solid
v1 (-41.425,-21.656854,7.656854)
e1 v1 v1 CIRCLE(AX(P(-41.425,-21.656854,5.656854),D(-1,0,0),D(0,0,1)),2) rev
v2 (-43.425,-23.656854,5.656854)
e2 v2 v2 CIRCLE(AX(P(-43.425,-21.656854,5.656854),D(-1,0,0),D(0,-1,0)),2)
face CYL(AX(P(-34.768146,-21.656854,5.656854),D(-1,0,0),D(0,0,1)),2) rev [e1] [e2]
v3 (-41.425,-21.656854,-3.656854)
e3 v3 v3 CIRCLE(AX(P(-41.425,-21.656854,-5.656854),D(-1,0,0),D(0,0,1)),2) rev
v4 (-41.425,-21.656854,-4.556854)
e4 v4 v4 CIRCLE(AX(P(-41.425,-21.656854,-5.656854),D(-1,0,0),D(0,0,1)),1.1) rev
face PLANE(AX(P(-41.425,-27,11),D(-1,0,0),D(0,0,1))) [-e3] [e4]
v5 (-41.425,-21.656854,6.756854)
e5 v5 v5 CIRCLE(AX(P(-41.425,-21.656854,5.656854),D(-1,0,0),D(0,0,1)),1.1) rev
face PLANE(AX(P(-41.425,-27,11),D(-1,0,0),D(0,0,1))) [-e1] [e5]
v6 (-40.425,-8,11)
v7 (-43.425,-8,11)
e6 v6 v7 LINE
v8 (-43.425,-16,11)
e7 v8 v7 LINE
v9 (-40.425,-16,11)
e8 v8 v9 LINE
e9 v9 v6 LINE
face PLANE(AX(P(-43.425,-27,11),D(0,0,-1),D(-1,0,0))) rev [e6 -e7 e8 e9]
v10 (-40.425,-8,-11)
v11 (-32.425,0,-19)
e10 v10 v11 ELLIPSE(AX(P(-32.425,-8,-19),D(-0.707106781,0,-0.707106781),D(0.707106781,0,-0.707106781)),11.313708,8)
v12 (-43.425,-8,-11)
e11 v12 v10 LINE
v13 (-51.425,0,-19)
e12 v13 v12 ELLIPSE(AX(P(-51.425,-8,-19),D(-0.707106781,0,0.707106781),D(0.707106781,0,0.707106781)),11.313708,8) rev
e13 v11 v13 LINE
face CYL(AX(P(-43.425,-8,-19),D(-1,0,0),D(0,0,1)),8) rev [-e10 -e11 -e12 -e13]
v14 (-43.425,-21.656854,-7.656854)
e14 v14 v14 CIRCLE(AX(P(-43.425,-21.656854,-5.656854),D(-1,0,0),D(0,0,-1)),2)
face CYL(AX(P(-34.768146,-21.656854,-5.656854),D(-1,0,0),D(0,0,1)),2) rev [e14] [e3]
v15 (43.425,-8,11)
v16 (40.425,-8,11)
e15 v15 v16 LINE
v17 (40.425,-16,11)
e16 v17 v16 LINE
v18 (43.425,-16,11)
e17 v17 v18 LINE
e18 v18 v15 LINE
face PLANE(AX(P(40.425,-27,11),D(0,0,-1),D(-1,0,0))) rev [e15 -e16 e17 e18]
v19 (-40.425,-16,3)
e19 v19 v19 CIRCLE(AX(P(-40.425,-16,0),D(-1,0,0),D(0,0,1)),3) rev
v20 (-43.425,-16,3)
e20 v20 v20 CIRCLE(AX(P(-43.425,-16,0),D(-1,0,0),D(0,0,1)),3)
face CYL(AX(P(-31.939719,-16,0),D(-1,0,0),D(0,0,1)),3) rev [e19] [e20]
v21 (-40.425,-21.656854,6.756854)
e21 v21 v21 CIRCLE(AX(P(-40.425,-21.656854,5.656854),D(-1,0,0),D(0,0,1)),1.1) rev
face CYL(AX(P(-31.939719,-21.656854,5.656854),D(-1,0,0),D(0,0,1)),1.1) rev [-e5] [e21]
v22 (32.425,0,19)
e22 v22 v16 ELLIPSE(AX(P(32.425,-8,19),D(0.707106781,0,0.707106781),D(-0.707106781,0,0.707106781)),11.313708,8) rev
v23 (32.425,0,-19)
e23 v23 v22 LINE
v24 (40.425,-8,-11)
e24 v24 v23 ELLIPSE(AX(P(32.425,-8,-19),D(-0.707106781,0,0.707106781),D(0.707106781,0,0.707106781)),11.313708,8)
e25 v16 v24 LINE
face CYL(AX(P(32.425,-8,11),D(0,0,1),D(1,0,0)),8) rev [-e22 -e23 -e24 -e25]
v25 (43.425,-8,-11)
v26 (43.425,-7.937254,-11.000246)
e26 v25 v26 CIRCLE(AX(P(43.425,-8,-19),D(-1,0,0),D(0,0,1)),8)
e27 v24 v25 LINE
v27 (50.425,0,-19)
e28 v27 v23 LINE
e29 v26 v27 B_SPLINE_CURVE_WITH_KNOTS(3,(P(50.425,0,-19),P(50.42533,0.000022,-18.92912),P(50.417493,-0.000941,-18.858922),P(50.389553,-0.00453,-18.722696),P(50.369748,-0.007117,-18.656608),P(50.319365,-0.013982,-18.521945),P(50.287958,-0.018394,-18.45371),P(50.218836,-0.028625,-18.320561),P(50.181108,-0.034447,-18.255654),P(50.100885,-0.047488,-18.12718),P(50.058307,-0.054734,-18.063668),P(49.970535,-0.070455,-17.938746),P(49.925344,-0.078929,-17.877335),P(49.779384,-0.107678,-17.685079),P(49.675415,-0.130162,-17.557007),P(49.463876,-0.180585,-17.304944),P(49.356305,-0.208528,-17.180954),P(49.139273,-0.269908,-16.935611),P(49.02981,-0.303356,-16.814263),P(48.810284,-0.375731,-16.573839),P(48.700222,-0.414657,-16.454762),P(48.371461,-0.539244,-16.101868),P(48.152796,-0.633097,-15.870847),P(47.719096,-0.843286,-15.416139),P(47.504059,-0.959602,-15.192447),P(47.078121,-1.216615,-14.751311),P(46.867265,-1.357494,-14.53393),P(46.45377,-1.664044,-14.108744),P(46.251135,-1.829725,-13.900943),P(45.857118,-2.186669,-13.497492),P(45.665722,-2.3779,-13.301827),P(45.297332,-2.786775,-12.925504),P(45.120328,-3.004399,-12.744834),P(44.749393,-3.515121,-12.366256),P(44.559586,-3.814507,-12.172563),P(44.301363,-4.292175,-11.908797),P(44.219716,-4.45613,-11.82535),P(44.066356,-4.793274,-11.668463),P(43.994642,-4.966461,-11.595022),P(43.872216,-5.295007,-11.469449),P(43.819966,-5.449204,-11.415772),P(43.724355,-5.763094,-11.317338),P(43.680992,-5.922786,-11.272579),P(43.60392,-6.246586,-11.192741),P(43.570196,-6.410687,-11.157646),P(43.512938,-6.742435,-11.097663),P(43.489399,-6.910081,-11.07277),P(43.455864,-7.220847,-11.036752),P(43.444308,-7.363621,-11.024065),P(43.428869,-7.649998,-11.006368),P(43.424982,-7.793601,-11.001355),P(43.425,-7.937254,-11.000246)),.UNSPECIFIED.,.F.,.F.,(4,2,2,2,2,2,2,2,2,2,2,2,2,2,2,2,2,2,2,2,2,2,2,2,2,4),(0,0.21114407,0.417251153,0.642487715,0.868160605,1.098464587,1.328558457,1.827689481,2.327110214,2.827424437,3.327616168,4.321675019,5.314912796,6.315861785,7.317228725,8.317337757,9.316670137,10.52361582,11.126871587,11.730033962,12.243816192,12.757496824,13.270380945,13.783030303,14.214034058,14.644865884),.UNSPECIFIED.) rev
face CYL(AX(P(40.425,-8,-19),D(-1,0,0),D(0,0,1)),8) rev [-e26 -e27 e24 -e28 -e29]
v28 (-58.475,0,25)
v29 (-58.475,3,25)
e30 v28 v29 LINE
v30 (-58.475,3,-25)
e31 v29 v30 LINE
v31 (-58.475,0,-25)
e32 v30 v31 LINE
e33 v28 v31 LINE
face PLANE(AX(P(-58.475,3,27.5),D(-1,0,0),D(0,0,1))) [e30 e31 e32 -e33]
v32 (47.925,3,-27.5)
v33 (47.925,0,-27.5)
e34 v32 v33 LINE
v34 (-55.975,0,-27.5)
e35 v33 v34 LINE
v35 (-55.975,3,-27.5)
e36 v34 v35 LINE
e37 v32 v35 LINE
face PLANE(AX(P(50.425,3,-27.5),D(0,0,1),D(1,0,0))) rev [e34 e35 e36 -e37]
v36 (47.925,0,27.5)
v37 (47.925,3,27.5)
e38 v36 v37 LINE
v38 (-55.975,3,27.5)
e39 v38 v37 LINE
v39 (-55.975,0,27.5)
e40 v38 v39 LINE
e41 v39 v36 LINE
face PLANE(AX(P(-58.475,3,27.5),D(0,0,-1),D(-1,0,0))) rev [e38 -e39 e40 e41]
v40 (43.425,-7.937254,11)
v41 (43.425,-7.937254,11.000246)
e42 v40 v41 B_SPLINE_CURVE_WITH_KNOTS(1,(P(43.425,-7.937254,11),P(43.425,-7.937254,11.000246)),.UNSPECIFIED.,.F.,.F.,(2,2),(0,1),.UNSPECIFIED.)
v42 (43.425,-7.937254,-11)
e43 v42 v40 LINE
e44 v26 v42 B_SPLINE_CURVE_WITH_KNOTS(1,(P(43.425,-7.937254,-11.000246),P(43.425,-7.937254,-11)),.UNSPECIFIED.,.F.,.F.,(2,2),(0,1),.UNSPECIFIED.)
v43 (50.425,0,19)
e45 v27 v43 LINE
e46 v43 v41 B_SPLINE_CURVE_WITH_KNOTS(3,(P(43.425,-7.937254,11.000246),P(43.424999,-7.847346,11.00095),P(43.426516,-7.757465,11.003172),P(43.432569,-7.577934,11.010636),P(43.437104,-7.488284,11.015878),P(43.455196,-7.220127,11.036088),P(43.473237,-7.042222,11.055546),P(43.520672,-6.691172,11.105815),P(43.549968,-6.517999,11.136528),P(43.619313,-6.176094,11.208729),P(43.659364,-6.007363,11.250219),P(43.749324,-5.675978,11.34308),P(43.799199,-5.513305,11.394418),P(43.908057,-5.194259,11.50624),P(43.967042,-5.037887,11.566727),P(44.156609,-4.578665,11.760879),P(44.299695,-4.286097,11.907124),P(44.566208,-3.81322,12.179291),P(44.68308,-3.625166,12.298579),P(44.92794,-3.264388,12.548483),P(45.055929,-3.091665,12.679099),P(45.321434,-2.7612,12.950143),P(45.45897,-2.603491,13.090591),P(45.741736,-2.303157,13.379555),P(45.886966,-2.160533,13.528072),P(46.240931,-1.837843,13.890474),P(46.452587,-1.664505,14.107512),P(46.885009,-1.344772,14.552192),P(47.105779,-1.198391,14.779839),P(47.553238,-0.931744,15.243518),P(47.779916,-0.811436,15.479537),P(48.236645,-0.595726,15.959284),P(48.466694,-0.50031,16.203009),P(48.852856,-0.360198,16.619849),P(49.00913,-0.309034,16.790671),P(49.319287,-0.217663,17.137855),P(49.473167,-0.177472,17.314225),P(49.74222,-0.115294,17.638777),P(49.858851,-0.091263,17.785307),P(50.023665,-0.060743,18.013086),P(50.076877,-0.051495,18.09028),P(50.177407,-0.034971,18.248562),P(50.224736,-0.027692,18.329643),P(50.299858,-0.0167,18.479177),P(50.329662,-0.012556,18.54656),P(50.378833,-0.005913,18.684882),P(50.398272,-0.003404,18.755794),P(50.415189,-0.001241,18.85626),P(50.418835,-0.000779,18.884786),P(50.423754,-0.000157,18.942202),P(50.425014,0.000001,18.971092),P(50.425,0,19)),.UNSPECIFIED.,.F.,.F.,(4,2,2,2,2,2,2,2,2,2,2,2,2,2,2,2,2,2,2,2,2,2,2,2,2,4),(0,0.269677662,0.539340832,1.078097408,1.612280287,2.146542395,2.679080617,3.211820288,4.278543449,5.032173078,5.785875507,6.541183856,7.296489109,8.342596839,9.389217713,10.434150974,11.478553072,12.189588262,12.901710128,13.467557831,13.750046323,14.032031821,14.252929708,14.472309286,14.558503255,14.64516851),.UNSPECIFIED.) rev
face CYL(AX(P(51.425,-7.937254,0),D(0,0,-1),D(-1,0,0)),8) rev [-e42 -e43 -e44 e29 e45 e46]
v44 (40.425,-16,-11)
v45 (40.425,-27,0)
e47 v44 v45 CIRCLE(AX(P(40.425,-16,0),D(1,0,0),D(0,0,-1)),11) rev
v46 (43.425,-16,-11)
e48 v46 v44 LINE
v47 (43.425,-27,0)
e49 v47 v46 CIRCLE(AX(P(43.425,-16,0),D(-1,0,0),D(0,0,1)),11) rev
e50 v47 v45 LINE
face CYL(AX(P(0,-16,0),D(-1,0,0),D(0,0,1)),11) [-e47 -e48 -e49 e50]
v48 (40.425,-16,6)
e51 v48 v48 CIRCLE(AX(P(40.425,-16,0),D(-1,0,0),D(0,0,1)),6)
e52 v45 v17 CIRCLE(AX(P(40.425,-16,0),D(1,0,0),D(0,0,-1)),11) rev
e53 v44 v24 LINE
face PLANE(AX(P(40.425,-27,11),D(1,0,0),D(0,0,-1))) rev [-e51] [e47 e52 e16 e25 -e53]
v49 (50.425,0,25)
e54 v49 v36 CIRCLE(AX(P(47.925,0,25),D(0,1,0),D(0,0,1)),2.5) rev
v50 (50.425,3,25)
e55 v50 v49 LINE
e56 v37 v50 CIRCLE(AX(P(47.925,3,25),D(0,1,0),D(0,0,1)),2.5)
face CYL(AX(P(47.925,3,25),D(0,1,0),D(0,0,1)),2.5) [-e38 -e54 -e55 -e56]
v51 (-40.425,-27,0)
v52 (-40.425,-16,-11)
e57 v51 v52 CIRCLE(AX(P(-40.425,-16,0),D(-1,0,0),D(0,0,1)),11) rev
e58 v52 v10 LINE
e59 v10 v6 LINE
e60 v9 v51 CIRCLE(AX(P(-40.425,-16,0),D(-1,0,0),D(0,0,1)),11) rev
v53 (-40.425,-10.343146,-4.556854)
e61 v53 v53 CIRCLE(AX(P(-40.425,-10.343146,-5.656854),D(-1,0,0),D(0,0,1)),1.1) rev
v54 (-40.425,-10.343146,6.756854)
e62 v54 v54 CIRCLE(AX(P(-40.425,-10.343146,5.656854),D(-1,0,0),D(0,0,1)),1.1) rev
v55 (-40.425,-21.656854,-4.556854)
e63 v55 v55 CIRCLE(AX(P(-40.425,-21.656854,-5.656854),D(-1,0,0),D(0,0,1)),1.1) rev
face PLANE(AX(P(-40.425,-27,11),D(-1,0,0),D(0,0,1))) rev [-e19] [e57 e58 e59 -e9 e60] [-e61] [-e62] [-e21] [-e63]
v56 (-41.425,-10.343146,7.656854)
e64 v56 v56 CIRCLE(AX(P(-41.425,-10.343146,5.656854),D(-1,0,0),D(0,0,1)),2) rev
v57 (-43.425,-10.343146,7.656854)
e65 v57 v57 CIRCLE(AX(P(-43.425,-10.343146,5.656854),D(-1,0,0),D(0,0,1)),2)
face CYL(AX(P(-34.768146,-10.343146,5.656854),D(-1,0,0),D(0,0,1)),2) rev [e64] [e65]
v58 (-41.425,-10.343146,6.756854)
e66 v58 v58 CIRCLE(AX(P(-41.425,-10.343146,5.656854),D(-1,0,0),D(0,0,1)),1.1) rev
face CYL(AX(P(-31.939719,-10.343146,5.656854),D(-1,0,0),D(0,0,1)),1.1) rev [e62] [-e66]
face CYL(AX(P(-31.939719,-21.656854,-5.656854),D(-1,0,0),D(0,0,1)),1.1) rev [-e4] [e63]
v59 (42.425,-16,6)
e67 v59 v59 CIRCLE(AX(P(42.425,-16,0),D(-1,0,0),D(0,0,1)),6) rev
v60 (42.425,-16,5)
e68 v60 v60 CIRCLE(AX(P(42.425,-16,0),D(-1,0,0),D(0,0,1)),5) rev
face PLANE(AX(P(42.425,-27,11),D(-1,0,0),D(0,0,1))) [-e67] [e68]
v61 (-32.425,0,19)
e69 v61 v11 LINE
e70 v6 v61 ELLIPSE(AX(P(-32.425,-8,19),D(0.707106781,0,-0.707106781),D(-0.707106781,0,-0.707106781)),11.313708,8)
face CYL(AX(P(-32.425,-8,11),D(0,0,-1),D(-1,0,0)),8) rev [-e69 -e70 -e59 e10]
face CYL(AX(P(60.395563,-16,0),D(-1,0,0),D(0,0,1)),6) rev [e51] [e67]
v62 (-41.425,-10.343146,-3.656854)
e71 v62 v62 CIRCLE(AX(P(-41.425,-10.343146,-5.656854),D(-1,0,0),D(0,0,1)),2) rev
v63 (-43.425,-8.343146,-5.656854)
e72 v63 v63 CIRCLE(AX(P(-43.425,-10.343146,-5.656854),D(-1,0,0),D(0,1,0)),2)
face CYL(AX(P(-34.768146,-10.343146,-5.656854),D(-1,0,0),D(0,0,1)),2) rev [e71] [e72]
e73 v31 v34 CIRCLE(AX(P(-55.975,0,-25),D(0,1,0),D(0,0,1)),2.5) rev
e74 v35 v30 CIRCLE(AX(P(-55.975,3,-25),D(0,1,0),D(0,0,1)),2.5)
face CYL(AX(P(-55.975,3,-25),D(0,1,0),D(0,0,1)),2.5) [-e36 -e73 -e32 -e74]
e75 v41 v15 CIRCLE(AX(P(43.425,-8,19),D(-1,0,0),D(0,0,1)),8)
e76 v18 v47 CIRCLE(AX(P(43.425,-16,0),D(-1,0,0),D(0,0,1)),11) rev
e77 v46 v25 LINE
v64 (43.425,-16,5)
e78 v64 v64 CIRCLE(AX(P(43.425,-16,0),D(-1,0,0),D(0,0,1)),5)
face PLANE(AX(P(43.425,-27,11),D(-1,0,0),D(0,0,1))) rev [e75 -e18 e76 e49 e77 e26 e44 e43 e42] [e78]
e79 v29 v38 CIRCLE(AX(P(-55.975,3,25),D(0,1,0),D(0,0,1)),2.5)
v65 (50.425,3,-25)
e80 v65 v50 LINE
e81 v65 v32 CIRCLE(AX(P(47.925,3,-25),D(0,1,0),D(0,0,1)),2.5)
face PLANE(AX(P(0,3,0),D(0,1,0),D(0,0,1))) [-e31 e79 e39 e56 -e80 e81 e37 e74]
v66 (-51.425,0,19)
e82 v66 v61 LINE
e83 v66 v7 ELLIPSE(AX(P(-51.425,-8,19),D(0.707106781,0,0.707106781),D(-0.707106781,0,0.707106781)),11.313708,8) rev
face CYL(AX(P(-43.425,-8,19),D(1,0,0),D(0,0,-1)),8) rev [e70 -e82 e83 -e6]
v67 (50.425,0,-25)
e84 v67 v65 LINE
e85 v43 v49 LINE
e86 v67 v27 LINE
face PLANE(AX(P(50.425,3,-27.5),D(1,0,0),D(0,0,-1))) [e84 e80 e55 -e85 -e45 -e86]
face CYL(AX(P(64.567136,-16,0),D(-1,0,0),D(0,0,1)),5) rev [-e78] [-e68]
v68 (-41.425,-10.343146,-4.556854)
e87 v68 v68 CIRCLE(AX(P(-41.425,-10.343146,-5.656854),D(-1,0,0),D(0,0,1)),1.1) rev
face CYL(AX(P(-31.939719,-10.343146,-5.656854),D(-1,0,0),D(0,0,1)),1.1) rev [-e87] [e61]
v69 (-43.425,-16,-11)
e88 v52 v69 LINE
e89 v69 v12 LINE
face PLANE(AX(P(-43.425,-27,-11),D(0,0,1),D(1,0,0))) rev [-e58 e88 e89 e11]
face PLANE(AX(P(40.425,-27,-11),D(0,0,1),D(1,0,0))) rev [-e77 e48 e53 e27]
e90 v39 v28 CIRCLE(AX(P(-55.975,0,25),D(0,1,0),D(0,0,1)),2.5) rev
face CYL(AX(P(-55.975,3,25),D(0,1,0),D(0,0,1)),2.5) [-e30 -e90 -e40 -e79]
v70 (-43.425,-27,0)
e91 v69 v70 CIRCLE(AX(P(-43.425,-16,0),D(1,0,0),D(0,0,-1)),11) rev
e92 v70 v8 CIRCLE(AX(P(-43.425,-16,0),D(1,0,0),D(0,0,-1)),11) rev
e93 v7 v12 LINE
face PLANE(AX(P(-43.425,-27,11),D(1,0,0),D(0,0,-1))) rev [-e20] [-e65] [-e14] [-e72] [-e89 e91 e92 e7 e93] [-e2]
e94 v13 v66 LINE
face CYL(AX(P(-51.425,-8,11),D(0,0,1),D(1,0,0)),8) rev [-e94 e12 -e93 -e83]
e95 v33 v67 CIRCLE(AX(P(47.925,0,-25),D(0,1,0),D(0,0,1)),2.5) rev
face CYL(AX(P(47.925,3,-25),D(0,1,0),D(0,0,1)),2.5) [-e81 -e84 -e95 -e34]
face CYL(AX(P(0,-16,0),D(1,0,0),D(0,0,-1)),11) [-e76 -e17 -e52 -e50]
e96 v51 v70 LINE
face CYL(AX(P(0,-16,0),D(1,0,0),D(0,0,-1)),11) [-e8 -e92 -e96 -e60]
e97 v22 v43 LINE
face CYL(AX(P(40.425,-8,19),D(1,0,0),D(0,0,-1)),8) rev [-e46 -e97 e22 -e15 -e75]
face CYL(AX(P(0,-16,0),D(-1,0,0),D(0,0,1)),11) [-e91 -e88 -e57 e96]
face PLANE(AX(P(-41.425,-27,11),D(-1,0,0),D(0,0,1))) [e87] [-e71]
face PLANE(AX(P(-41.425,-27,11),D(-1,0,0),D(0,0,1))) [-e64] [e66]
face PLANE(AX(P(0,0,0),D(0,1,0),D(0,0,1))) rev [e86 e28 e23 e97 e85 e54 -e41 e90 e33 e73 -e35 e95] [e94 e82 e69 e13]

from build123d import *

# Parameters (mm, degrees)
SKETCH1_W           = 108.9
SKETCH1_H           = 55
BOSS_EXTRUDE1_DEPTH = 3
SKETCH5_W           = 3
SKETCH5_H           = 22
BOSS_EXTRUDE2_DEPTH = 27
SKETCH2_R           = 3
SKETCH2_R_2         = 1.1
CUT_EXTRUDE1_DEPTH  = 3
CIRPATTERN1_COUNT   = 4
FILLET3_R           = 11
SKETCH6_R           = 2
CUT_EXTRUDE5_DEPTH  = 2
CIRPATTERN2_COUNT   = 4
SKETCH7_R           = 5
CUT_EXTRUDE6_DEPTH  = 10
SKETCH7_5_R         = 6
SKETCH7_5_R_2       = 5
CUT_EXTRUDE7_DEPTH  = 2
FILLET4_R           = 8
FILETE1_R           = 2.5


# Some blends are built 0.0001 mm under size
with BuildPart() as part:
    # Sketch1 → Boss-Extrude1 (new body)
    with BuildSketch(Plane(origin=(0, 0, 0), x_dir=(1, 0, 0), z_dir=(0, 1, 0))):
        with Locations((-4.025, 0)):
            Rectangle(SKETCH1_W, SKETCH1_H)
    extrude(amount=BOSS_EXTRUDE1_DEPTH)

    # Sketch5 → Boss-Extrude2 (add)
    with BuildSketch(Plane.XZ):
        with Locations((-41.925, 0)):
            Rectangle(SKETCH5_W, SKETCH5_H)
        with Locations((41.925, 0)):
            Rectangle(SKETCH5_W, SKETCH5_H)
    extrude(amount=BOSS_EXTRUDE2_DEPTH)

    # Sketch2 → Cut-Extrude1 (cut)
    with BuildSketch(Plane.ZY.offset(43.425)):
        with Locations((0, -16)):
            Circle(SKETCH2_R)
        with Locations((-5.656854249, -21.656854249)):
            Circle(SKETCH2_R_2)
    cut_extrude1 = extrude(amount=-CUT_EXTRUDE1_DEPTH, mode=Mode.SUBTRACT)

    # CirPattern1: Cut-Extrude1 ×4 about axis
    cirpattern1_axis = Axis((0, -16, 0), (1, 0, 0))
    for i in range(1, CIRPATTERN1_COUNT):
        add(cut_extrude1.rotate(cirpattern1_axis, i * 360 / CIRPATTERN1_COUNT), mode=Mode.SUBTRACT)

    # Fillet3
    fillet3_edges = [part.edges().sort_by_distance(p)[0] for p in [
        (-41.925, -27, -11),
        (-41.925, -27, 11),
        (41.925, -27, -11),
        (41.925, -27, 11),
    ]]
    fillet(fillet3_edges, radius=FILLET3_R - 0.0001)  # a hair under: the kernel refuses the full size

    # Sketch6 → Cut-Extrude5 (cut)
    with BuildSketch(Plane.ZY.offset(43.425)):
        with Locations((5.656854249, -10.343145751)):
            Circle(SKETCH6_R)
    cut_extrude5 = extrude(amount=-CUT_EXTRUDE5_DEPTH, mode=Mode.SUBTRACT)

    # CirPattern2: Cut-Extrude5 ×4 about axis
    cirpattern2_axis = Axis((0, -16, 0), (1, 0, 0))
    for i in range(1, CIRPATTERN2_COUNT):
        add(cut_extrude5.rotate(cirpattern2_axis, i * 360 / CIRPATTERN2_COUNT), mode=Mode.SUBTRACT)

    # Sketch7 → Cut-Extrude6 (cut)
    with BuildSketch(Plane.ZY.offset(-40.425)):
        with Locations((0, -16)):
            Circle(SKETCH7_R)
    extrude(amount=-CUT_EXTRUDE6_DEPTH, mode=Mode.SUBTRACT)

    # Sketch7<5> → Cut-Extrude7 (cut)
    with BuildSketch(Plane.ZY.offset(-40.425)):
        with Locations((0, -16)):
            Circle(SKETCH7_5_R)
        with Locations((0, -16)):
            Circle(SKETCH7_5_R_2, mode=Mode.SUBTRACT)
    extrude(amount=-CUT_EXTRUDE7_DEPTH, mode=Mode.SUBTRACT)

    # Fillet4
    # the kernel refuses this fillet: 8 mm, written as the material it adds along each edge
    with BuildSketch(Plane(origin=(-43.425, 0, -11), x_dir=(0, -1, 0), z_dir=(0, 0, 1))) as fillet4_piece_1:
        with BuildLine():
            CenterArc((FILLET4_R, -FILLET4_R), FILLET4_R, 90, 90)
            Line((0, -FILLET4_R), (-FILLET4_R * 0.02, -FILLET4_R))
            Line((-FILLET4_R * 0.02, -FILLET4_R), (-FILLET4_R * 0.02, FILLET4_R * 0.02))
            Line((-FILLET4_R * 0.02, FILLET4_R * 0.02), (FILLET4_R, FILLET4_R * 0.02))
            Line((FILLET4_R, FILLET4_R * 0.02), (FILLET4_R, 0))
        make_face()
    extrude(amount=22)
    with BuildSketch(Plane(origin=(-40.425, 0, -11), x_dir=(0, 0, -1), z_dir=(-1, 0, 0)), Plane(origin=(43.425, 0, -11), x_dir=(0, 0, -1), z_dir=(-1, 0, 0)), Plane(origin=(40.425, 0, 11), x_dir=(0, 0, 1), z_dir=(1, 0, 0))) as fillet4_piece_2:
        with BuildLine():
            CenterArc((FILLET4_R, FILLET4_R), FILLET4_R, 180, 90)
            Line((0, FILLET4_R), (-FILLET4_R * 0.02, FILLET4_R))
            Line((-FILLET4_R * 0.02, FILLET4_R), (-FILLET4_R * 0.02, -FILLET4_R * 0.02))
            Line((-FILLET4_R * 0.02, -FILLET4_R * 0.02), (FILLET4_R, -FILLET4_R * 0.02))
            Line((FILLET4_R, -FILLET4_R * 0.02), (FILLET4_R, 0))
        make_face()
    extrude(amount=3)
    with BuildSketch(Plane(origin=(-40.425, 0, 11), x_dir=(1, 0, 0), z_dir=(0, 0, -1)), Plane(origin=(40.425, 0, -11), x_dir=(-1, 0, 0), z_dir=(0, 0, 1))) as fillet4_piece_3:
        with BuildLine():
            CenterArc((FILLET4_R, FILLET4_R), FILLET4_R, 180, 90)
            Line((0, FILLET4_R), (-FILLET4_R * 0.02, FILLET4_R))
            Line((-FILLET4_R * 0.02, FILLET4_R), (-FILLET4_R * 0.02, -FILLET4_R * 0.02))
            Line((-FILLET4_R * 0.02, -FILLET4_R * 0.02), (FILLET4_R, -FILLET4_R * 0.02))
            Line((FILLET4_R, -FILLET4_R * 0.02), (FILLET4_R, 0))
        make_face()
    extrude(amount=22)
    with BuildSketch(Plane(origin=(-43.425, 0, 11), x_dir=(0, -1, 0), z_dir=(1, 0, 0))) as fillet4_piece_4:
        with BuildLine():
            CenterArc((FILLET4_R, -FILLET4_R), FILLET4_R, 90, 90)
            Line((0, -FILLET4_R), (-FILLET4_R * 0.02, -FILLET4_R))
            Line((-FILLET4_R * 0.02, -FILLET4_R), (-FILLET4_R * 0.02, FILLET4_R * 0.02))
            Line((-FILLET4_R * 0.02, FILLET4_R * 0.02), (FILLET4_R, FILLET4_R * 0.02))
            Line((FILLET4_R, FILLET4_R * 0.02), (FILLET4_R, 0))
        make_face()
    extrude(amount=3)
    with BuildSketch(Plane(origin=(43.425, 0, 11), x_dir=(1, 0, 0), z_dir=(0, 0, -1))) as fillet4_piece_5:
        with BuildLine():
            CenterArc((8, 7.937253933), FILLET4_R, 180, 82.819244219)
            Line((0, 7.937253933), (-0.16, 7.937253933))
            Line((-0.16, 7.937253933), (-0.16, 0))
            Line((-0.16, 0), (0, -0.16))
            ThreePointArc((0, -0.16), (3.5, -0.16), (6.98, -0.158745079))
            Line((6.98, -0.158745079), (7, 0))
        make_face()
    extrude(amount=22)
    with BuildSketch(Plane(origin=(-43.425, 0, -31), x_dir=(0, -1, 0), z_dir=(0, 0, 1))) as fillet4_piece_6a_section:
        with BuildLine():
            CenterArc((FILLET4_R, -FILLET4_R), FILLET4_R, 90, 90)
            Line((0, -FILLET4_R), (-FILLET4_R * 0.02, -FILLET4_R))
            Line((-FILLET4_R * 0.02, -FILLET4_R), (-FILLET4_R * 0.02, FILLET4_R * 0.02))
            Line((-FILLET4_R * 0.02, FILLET4_R * 0.02), (FILLET4_R, FILLET4_R * 0.02))
            Line((FILLET4_R, FILLET4_R * 0.02), (FILLET4_R, 0))
        make_face()
    fillet4_piece_6a = extrude(amount=42, mode=Mode.PRIVATE)
    fillet4_piece_6a = split(fillet4_piece_6a, bisect_by=Plane(origin=(-45.236160914, -1.811160914, -11), z_dir=(0, 0, -1)), keep=Keep.TOP, mode=Mode.PRIVATE)
    fillet4_piece_6a = split(fillet4_piece_6a, bisect_by=Plane(origin=(-45.236160914, -1.811160914, -27.5), z_dir=(0, 0, 1)), keep=Keep.TOP, mode=Mode.PRIVATE)
    with BuildSketch(Plane(origin=(-40.425, 0, -11), x_dir=(0, 0, -1), z_dir=(-1, 0, 0))) as fillet4_piece_6b_section:
        with BuildLine():
            CenterArc((FILLET4_R, FILLET4_R), FILLET4_R, 180, 90)
            Line((0, FILLET4_R), (-FILLET4_R * 0.02, FILLET4_R))
            Line((-FILLET4_R * 0.02, FILLET4_R), (-FILLET4_R * 0.02, -FILLET4_R * 0.02))
            Line((-FILLET4_R * 0.02, -FILLET4_R * 0.02), (FILLET4_R, -FILLET4_R * 0.02))
            Line((FILLET4_R, -FILLET4_R * 0.02), (FILLET4_R, 0))
        make_face()
    fillet4_piece_6b = extrude(amount=23, mode=Mode.PRIVATE)
    fillet4_piece_6b = split(fillet4_piece_6b, bisect_by=Plane(origin=(-43.425, -1.811160914, -12.811160914), z_dir=(-1, 0, 0)), keep=Keep.TOP, mode=Mode.PRIVATE)
    fillet4_piece_6b = split(fillet4_piece_6b, bisect_by=Plane(origin=(-58.475, -1.811160914, -12.811160914), z_dir=(1, 0, 0)), keep=Keep.TOP, mode=Mode.PRIVATE)
    fillet4_piece_6 = fillet4_piece_6a & fillet4_piece_6b
    add(fillet4_piece_6)
    with BuildSketch(Plane(origin=(-63.425, 0, 11), x_dir=(0, -1, 0), z_dir=(1, 0, 0))) as fillet4_piece_7a_section:
        with BuildLine():
            CenterArc((FILLET4_R, -FILLET4_R), FILLET4_R, 90, 90)
            Line((0, -FILLET4_R), (-FILLET4_R * 0.02, -FILLET4_R))
            Line((-FILLET4_R * 0.02, -FILLET4_R), (-FILLET4_R * 0.02, FILLET4_R * 0.02))
            Line((-FILLET4_R * 0.02, FILLET4_R * 0.02), (FILLET4_R, FILLET4_R * 0.02))
            Line((FILLET4_R, FILLET4_R * 0.02), (FILLET4_R, 0))
        make_face()
    fillet4_piece_7a = extrude(amount=23, mode=Mode.PRIVATE)
    fillet4_piece_7a = split(fillet4_piece_7a, bisect_by=Plane(origin=(-43.425, -1.811160914, 12.811160914), z_dir=(-1, 0, 0)), keep=Keep.TOP, mode=Mode.PRIVATE)
    fillet4_piece_7a = split(fillet4_piece_7a, bisect_by=Plane(origin=(-58.475, -1.811160914, 12.811160914), z_dir=(1, 0, 0)), keep=Keep.TOP, mode=Mode.PRIVATE)
    with BuildSketch(Plane(origin=(-43.425, 0, -11), x_dir=(0, -1, 0), z_dir=(0, 0, 1))) as fillet4_piece_7b_section:
        with BuildLine():
            CenterArc((FILLET4_R, -FILLET4_R), FILLET4_R, 90, 90)
            Line((0, -FILLET4_R), (-FILLET4_R * 0.02, -FILLET4_R))
            Line((-FILLET4_R * 0.02, -FILLET4_R), (-FILLET4_R * 0.02, FILLET4_R * 0.02))
            Line((-FILLET4_R * 0.02, FILLET4_R * 0.02), (FILLET4_R, FILLET4_R * 0.02))
            Line((FILLET4_R, FILLET4_R * 0.02), (FILLET4_R, 0))
        make_face()
    fillet4_piece_7b = extrude(amount=42, mode=Mode.PRIVATE)
    fillet4_piece_7b = split(fillet4_piece_7b, bisect_by=Plane(origin=(-45.236160914, -1.811160914, 11), z_dir=(0, 0, 1)), keep=Keep.TOP, mode=Mode.PRIVATE)
    fillet4_piece_7b = split(fillet4_piece_7b, bisect_by=Plane(origin=(-45.236160914, -1.811160914, 27.5), z_dir=(0, 0, -1)), keep=Keep.TOP, mode=Mode.PRIVATE)
    fillet4_piece_7 = fillet4_piece_7a & fillet4_piece_7b
    add(fillet4_piece_7)
    with BuildSketch(Plane(origin=(-20.425, 0, -11), x_dir=(0, 0, -1), z_dir=(-1, 0, 0))) as fillet4_piece_8a_section:
        with BuildLine():
            CenterArc((FILLET4_R, FILLET4_R), FILLET4_R, 180, 90)
            Line((0, FILLET4_R), (-FILLET4_R * 0.02, FILLET4_R))
            Line((-FILLET4_R * 0.02, FILLET4_R), (-FILLET4_R * 0.02, -FILLET4_R * 0.02))
            Line((-FILLET4_R * 0.02, -FILLET4_R * 0.02), (FILLET4_R, -FILLET4_R * 0.02))
            Line((FILLET4_R, -FILLET4_R * 0.02), (FILLET4_R, 0))
        make_face()
    fillet4_piece_8a = extrude(amount=23, mode=Mode.PRIVATE)
    fillet4_piece_8a = split(fillet4_piece_8a, bisect_by=Plane(origin=(-40.425, -1.811160914, -12.811160914), z_dir=(1, 0, 0)), keep=Keep.TOP, mode=Mode.PRIVATE)
    with BuildSketch(Plane(origin=(-40.425, 0, 11), x_dir=(1, 0, 0), z_dir=(0, 0, -1))) as fillet4_piece_8b_section:
        with BuildLine():
            CenterArc((FILLET4_R, FILLET4_R), FILLET4_R, 180, 90)
            Line((0, FILLET4_R), (-FILLET4_R * 0.02, FILLET4_R))
            Line((-FILLET4_R * 0.02, FILLET4_R), (-FILLET4_R * 0.02, -FILLET4_R * 0.02))
            Line((-FILLET4_R * 0.02, -FILLET4_R * 0.02), (FILLET4_R, -FILLET4_R * 0.02))
            Line((FILLET4_R, -FILLET4_R * 0.02), (FILLET4_R, 0))
        make_face()
    fillet4_piece_8b = extrude(amount=42, mode=Mode.PRIVATE)
    fillet4_piece_8b = split(fillet4_piece_8b, bisect_by=Plane(origin=(-38.613839086, -1.811160914, -27.5), z_dir=(0, 0, 1)), keep=Keep.TOP, mode=Mode.PRIVATE)
    fillet4_piece_8b = split(fillet4_piece_8b, bisect_by=Plane(origin=(-38.613839086, -1.811160914, -11), z_dir=(0, 0, -1)), keep=Keep.TOP, mode=Mode.PRIVATE)
    fillet4_piece_8 = fillet4_piece_8a & fillet4_piece_8b
    add(fillet4_piece_8)
    with BuildSketch(Plane(origin=(-43.425, 0, 11), x_dir=(0, -1, 0), z_dir=(1, 0, 0))) as fillet4_piece_9a_section:
        with BuildLine():
            CenterArc((FILLET4_R, -FILLET4_R), FILLET4_R, 90, 90)
            Line((0, -FILLET4_R), (-FILLET4_R * 0.02, -FILLET4_R))
            Line((-FILLET4_R * 0.02, -FILLET4_R), (-FILLET4_R * 0.02, FILLET4_R * 0.02))
            Line((-FILLET4_R * 0.02, FILLET4_R * 0.02), (FILLET4_R, FILLET4_R * 0.02))
            Line((FILLET4_R, FILLET4_R * 0.02), (FILLET4_R, 0))
        make_face()
    fillet4_piece_9a = extrude(amount=23, mode=Mode.PRIVATE)
    fillet4_piece_9a = split(fillet4_piece_9a, bisect_by=Plane(origin=(-40.425, -1.811160914, 12.811160914), z_dir=(1, 0, 0)), keep=Keep.TOP, mode=Mode.PRIVATE)
    with BuildSketch(Plane(origin=(-40.425, 0, 31), x_dir=(1, 0, 0), z_dir=(0, 0, -1))) as fillet4_piece_9b_section:
        with BuildLine():
            CenterArc((FILLET4_R, FILLET4_R), FILLET4_R, 180, 90)
            Line((0, FILLET4_R), (-FILLET4_R * 0.02, FILLET4_R))
            Line((-FILLET4_R * 0.02, FILLET4_R), (-FILLET4_R * 0.02, -FILLET4_R * 0.02))
            Line((-FILLET4_R * 0.02, -FILLET4_R * 0.02), (FILLET4_R, -FILLET4_R * 0.02))
            Line((FILLET4_R, -FILLET4_R * 0.02), (FILLET4_R, 0))
        make_face()
    fillet4_piece_9b = extrude(amount=42, mode=Mode.PRIVATE)
    fillet4_piece_9b = split(fillet4_piece_9b, bisect_by=Plane(origin=(-38.613839086, -1.811160914, 11), z_dir=(0, 0, 1)), keep=Keep.TOP, mode=Mode.PRIVATE)
    fillet4_piece_9b = split(fillet4_piece_9b, bisect_by=Plane(origin=(-38.613839086, -1.811160914, 27.5), z_dir=(0, 0, -1)), keep=Keep.TOP, mode=Mode.PRIVATE)
    fillet4_piece_9 = fillet4_piece_9a & fillet4_piece_9b
    add(fillet4_piece_9)
    with BuildSketch(Plane(origin=(40.425, 0, -31), x_dir=(-1, 0, 0), z_dir=(0, 0, 1))) as fillet4_piece_10a_section:
        with BuildLine():
            CenterArc((FILLET4_R, FILLET4_R), FILLET4_R, 180, 90)
            Line((0, FILLET4_R), (-FILLET4_R * 0.02, FILLET4_R))
            Line((-FILLET4_R * 0.02, FILLET4_R), (-FILLET4_R * 0.02, -FILLET4_R * 0.02))
            Line((-FILLET4_R * 0.02, -FILLET4_R * 0.02), (FILLET4_R, -FILLET4_R * 0.02))
            Line((FILLET4_R, -FILLET4_R * 0.02), (FILLET4_R, 0))
        make_face()
    fillet4_piece_10a = extrude(amount=42, mode=Mode.PRIVATE)
    fillet4_piece_10a = split(fillet4_piece_10a, bisect_by=Plane(origin=(38.613839086, -1.811160914, -27.5), z_dir=(0, 0, 1)), keep=Keep.TOP, mode=Mode.PRIVATE)
    fillet4_piece_10a = split(fillet4_piece_10a, bisect_by=Plane(origin=(38.613839086, -1.811160914, -11), z_dir=(0, 0, -1)), keep=Keep.TOP, mode=Mode.PRIVATE)
    with BuildSketch(Plane(origin=(43.425, 0, -11), x_dir=(0, 0, -1), z_dir=(-1, 0, 0))) as fillet4_piece_10b_section:
        with BuildLine():
            CenterArc((FILLET4_R, FILLET4_R), FILLET4_R, 180, 90)
            Line((0, FILLET4_R), (-FILLET4_R * 0.02, FILLET4_R))
            Line((-FILLET4_R * 0.02, FILLET4_R), (-FILLET4_R * 0.02, -FILLET4_R * 0.02))
            Line((-FILLET4_R * 0.02, -FILLET4_R * 0.02), (FILLET4_R, -FILLET4_R * 0.02))
            Line((FILLET4_R, -FILLET4_R * 0.02), (FILLET4_R, 0))
        make_face()
    fillet4_piece_10b = extrude(amount=23, mode=Mode.PRIVATE)
    fillet4_piece_10b = split(fillet4_piece_10b, bisect_by=Plane(origin=(40.425, -1.811160914, -12.811160914), z_dir=(-1, 0, 0)), keep=Keep.TOP, mode=Mode.PRIVATE)
    fillet4_piece_10 = fillet4_piece_10a & fillet4_piece_10b
    add(fillet4_piece_10)
    with BuildSketch(Plane(origin=(40.425, 0, -11), x_dir=(-1, 0, 0), z_dir=(0, 0, 1))) as fillet4_piece_11a_section:
        with BuildLine():
            CenterArc((FILLET4_R, FILLET4_R), FILLET4_R, 180, 90)
            Line((0, FILLET4_R), (-FILLET4_R * 0.02, FILLET4_R))
            Line((-FILLET4_R * 0.02, FILLET4_R), (-FILLET4_R * 0.02, -FILLET4_R * 0.02))
            Line((-FILLET4_R * 0.02, -FILLET4_R * 0.02), (FILLET4_R, -FILLET4_R * 0.02))
            Line((FILLET4_R, -FILLET4_R * 0.02), (FILLET4_R, 0))
        make_face()
    fillet4_piece_11a = extrude(amount=42, mode=Mode.PRIVATE)
    fillet4_piece_11a = split(fillet4_piece_11a, bisect_by=Plane(origin=(38.613839086, -1.811160914, 27.5), z_dir=(0, 0, -1)), keep=Keep.TOP, mode=Mode.PRIVATE)
    fillet4_piece_11a = split(fillet4_piece_11a, bisect_by=Plane(origin=(38.613839086, -1.811160914, 11), z_dir=(0, 0, 1)), keep=Keep.TOP, mode=Mode.PRIVATE)
    with BuildSketch(Plane(origin=(20.425, 0, 11), x_dir=(0, 0, 1), z_dir=(1, 0, 0))) as fillet4_piece_11b_section:
        with BuildLine():
            CenterArc((FILLET4_R, FILLET4_R), FILLET4_R, 180, 90)
            Line((0, FILLET4_R), (-FILLET4_R * 0.02, FILLET4_R))
            Line((-FILLET4_R * 0.02, FILLET4_R), (-FILLET4_R * 0.02, -FILLET4_R * 0.02))
            Line((-FILLET4_R * 0.02, -FILLET4_R * 0.02), (FILLET4_R, -FILLET4_R * 0.02))
            Line((FILLET4_R, -FILLET4_R * 0.02), (FILLET4_R, 0))
        make_face()
    fillet4_piece_11b = extrude(amount=23, mode=Mode.PRIVATE)
    fillet4_piece_11b = split(fillet4_piece_11b, bisect_by=Plane(origin=(40.425, -1.811160914, 12.811160914), z_dir=(-1, 0, 0)), keep=Keep.TOP, mode=Mode.PRIVATE)
    fillet4_piece_11 = fillet4_piece_11a & fillet4_piece_11b
    add(fillet4_piece_11)
    with BuildSketch(Plane(origin=(63.425, 0, -11), x_dir=(0, 0, -1), z_dir=(-1, 0, 0))) as fillet4_piece_12a_section:
        with BuildLine():
            CenterArc((FILLET4_R, FILLET4_R), FILLET4_R, 180, 90)
            Line((0, FILLET4_R), (-FILLET4_R * 0.02, FILLET4_R))
            Line((-FILLET4_R * 0.02, FILLET4_R), (-FILLET4_R * 0.02, -FILLET4_R * 0.02))
            Line((-FILLET4_R * 0.02, -FILLET4_R * 0.02), (FILLET4_R, -FILLET4_R * 0.02))
            Line((FILLET4_R, -FILLET4_R * 0.02), (FILLET4_R, 0))
        make_face()
    fillet4_piece_12a = extrude(amount=23, mode=Mode.PRIVATE)
    fillet4_piece_12a = split(fillet4_piece_12a, bisect_by=Plane(origin=(50.425, -1.811160914, -12.811160914), z_dir=(-1, 0, 0)), keep=Keep.TOP, mode=Mode.PRIVATE)
    fillet4_piece_12a = split(fillet4_piece_12a, bisect_by=Plane(origin=(43.425, -1.811160914, -12.811160914), z_dir=(1, 0, 0)), keep=Keep.TOP, mode=Mode.PRIVATE)
    with BuildSketch(Plane(origin=(43.425, 0, 11), x_dir=(1, 0, 0), z_dir=(0, 0, -1))) as fillet4_piece_12b_section:
        with BuildLine():
            CenterArc((8, 7.937253933), FILLET4_R, 180, 82.819244219)
            Line((0, 7.937253933), (-0.16, 7.937253933))
            Line((-0.16, 7.937253933), (-0.16, 0))
            Line((-0.16, 0), (0, -0.16))
            ThreePointArc((0, -0.16), (3.5, -0.16), (6.98, -0.158745079))
            Line((6.98, -0.158745079), (7, 0))
        make_face()
    fillet4_piece_12b = extrude(amount=41.843134833, mode=Mode.PRIVATE)
    fillet4_piece_12b = split(fillet4_piece_12b, bisect_by=Plane(origin=(45.12528275, -1.827589543, -27.5), z_dir=(0, 0, 1)), keep=Keep.TOP, mode=Mode.PRIVATE)
    fillet4_piece_12b = split(fillet4_piece_12b, bisect_by=Plane(origin=(45.12528275, -1.827589543, -11), z_dir=(0, 0, -1)), keep=Keep.TOP, mode=Mode.PRIVATE)
    fillet4_piece_12 = fillet4_piece_12a & fillet4_piece_12b
    add(fillet4_piece_12)
    with BuildSketch(Plane(origin=(43.425, 0, 30.843134833), x_dir=(1, 0, 0), z_dir=(0, 0, -1))) as fillet4_piece_13a_section:
        with BuildLine():
            CenterArc((8, 7.937253933), FILLET4_R, 180, 82.819244219)
            Line((0, 7.937253933), (-0.16, 7.937253933))
            Line((-0.16, 7.937253933), (-0.16, 0))
            Line((-0.16, 0), (0, -0.16))
            ThreePointArc((0, -0.16), (3.5, -0.16), (6.98, -0.158745079))
            Line((6.98, -0.158745079), (7, 0))
        make_face()
    fillet4_piece_13a = extrude(amount=41.843134833, mode=Mode.PRIVATE)
    fillet4_piece_13a = split(fillet4_piece_13a, bisect_by=Plane(origin=(45.12528275, -1.827589543, 27.5), z_dir=(0, 0, -1)), keep=Keep.TOP, mode=Mode.PRIVATE)
    fillet4_piece_13a = split(fillet4_piece_13a, bisect_by=Plane(origin=(45.12528275, -1.827589543, 11), z_dir=(0, 0, 1)), keep=Keep.TOP, mode=Mode.PRIVATE)
    with BuildSketch(Plane(origin=(40.425, 0, 11), x_dir=(0, 0, 1), z_dir=(1, 0, 0))) as fillet4_piece_13b_section:
        with BuildLine():
            CenterArc((FILLET4_R, FILLET4_R), FILLET4_R, 180, 90)
            Line((0, FILLET4_R), (-FILLET4_R * 0.02, FILLET4_R))
            Line((-FILLET4_R * 0.02, FILLET4_R), (-FILLET4_R * 0.02, -FILLET4_R * 0.02))
            Line((-FILLET4_R * 0.02, -FILLET4_R * 0.02), (FILLET4_R, -FILLET4_R * 0.02))
            Line((FILLET4_R, -FILLET4_R * 0.02), (FILLET4_R, 0))
        make_face()
    fillet4_piece_13b = extrude(amount=23, mode=Mode.PRIVATE)
    fillet4_piece_13b = split(fillet4_piece_13b, bisect_by=Plane(origin=(50.425, -1.811160914, 12.811160914), z_dir=(-1, 0, 0)), keep=Keep.TOP, mode=Mode.PRIVATE)
    fillet4_piece_13b = split(fillet4_piece_13b, bisect_by=Plane(origin=(43.425, -1.811160914, 12.811160914), z_dir=(1, 0, 0)), keep=Keep.TOP, mode=Mode.PRIVATE)
    fillet4_piece_13 = fillet4_piece_13a & fillet4_piece_13b
    add(fillet4_piece_13)

    # Filete1
    filete1_edges = [part.edges().sort_by_distance(p)[0] for p in [
        (50.425, 1.5, -27.5),
        (-58.475, 1.5, -27.5),
        (-58.475, 1.5, 27.5),
        (50.425, 1.5, 27.5),
    ]]
    fillet(filete1_edges, radius=FILETE1_R)


solid = part.part
